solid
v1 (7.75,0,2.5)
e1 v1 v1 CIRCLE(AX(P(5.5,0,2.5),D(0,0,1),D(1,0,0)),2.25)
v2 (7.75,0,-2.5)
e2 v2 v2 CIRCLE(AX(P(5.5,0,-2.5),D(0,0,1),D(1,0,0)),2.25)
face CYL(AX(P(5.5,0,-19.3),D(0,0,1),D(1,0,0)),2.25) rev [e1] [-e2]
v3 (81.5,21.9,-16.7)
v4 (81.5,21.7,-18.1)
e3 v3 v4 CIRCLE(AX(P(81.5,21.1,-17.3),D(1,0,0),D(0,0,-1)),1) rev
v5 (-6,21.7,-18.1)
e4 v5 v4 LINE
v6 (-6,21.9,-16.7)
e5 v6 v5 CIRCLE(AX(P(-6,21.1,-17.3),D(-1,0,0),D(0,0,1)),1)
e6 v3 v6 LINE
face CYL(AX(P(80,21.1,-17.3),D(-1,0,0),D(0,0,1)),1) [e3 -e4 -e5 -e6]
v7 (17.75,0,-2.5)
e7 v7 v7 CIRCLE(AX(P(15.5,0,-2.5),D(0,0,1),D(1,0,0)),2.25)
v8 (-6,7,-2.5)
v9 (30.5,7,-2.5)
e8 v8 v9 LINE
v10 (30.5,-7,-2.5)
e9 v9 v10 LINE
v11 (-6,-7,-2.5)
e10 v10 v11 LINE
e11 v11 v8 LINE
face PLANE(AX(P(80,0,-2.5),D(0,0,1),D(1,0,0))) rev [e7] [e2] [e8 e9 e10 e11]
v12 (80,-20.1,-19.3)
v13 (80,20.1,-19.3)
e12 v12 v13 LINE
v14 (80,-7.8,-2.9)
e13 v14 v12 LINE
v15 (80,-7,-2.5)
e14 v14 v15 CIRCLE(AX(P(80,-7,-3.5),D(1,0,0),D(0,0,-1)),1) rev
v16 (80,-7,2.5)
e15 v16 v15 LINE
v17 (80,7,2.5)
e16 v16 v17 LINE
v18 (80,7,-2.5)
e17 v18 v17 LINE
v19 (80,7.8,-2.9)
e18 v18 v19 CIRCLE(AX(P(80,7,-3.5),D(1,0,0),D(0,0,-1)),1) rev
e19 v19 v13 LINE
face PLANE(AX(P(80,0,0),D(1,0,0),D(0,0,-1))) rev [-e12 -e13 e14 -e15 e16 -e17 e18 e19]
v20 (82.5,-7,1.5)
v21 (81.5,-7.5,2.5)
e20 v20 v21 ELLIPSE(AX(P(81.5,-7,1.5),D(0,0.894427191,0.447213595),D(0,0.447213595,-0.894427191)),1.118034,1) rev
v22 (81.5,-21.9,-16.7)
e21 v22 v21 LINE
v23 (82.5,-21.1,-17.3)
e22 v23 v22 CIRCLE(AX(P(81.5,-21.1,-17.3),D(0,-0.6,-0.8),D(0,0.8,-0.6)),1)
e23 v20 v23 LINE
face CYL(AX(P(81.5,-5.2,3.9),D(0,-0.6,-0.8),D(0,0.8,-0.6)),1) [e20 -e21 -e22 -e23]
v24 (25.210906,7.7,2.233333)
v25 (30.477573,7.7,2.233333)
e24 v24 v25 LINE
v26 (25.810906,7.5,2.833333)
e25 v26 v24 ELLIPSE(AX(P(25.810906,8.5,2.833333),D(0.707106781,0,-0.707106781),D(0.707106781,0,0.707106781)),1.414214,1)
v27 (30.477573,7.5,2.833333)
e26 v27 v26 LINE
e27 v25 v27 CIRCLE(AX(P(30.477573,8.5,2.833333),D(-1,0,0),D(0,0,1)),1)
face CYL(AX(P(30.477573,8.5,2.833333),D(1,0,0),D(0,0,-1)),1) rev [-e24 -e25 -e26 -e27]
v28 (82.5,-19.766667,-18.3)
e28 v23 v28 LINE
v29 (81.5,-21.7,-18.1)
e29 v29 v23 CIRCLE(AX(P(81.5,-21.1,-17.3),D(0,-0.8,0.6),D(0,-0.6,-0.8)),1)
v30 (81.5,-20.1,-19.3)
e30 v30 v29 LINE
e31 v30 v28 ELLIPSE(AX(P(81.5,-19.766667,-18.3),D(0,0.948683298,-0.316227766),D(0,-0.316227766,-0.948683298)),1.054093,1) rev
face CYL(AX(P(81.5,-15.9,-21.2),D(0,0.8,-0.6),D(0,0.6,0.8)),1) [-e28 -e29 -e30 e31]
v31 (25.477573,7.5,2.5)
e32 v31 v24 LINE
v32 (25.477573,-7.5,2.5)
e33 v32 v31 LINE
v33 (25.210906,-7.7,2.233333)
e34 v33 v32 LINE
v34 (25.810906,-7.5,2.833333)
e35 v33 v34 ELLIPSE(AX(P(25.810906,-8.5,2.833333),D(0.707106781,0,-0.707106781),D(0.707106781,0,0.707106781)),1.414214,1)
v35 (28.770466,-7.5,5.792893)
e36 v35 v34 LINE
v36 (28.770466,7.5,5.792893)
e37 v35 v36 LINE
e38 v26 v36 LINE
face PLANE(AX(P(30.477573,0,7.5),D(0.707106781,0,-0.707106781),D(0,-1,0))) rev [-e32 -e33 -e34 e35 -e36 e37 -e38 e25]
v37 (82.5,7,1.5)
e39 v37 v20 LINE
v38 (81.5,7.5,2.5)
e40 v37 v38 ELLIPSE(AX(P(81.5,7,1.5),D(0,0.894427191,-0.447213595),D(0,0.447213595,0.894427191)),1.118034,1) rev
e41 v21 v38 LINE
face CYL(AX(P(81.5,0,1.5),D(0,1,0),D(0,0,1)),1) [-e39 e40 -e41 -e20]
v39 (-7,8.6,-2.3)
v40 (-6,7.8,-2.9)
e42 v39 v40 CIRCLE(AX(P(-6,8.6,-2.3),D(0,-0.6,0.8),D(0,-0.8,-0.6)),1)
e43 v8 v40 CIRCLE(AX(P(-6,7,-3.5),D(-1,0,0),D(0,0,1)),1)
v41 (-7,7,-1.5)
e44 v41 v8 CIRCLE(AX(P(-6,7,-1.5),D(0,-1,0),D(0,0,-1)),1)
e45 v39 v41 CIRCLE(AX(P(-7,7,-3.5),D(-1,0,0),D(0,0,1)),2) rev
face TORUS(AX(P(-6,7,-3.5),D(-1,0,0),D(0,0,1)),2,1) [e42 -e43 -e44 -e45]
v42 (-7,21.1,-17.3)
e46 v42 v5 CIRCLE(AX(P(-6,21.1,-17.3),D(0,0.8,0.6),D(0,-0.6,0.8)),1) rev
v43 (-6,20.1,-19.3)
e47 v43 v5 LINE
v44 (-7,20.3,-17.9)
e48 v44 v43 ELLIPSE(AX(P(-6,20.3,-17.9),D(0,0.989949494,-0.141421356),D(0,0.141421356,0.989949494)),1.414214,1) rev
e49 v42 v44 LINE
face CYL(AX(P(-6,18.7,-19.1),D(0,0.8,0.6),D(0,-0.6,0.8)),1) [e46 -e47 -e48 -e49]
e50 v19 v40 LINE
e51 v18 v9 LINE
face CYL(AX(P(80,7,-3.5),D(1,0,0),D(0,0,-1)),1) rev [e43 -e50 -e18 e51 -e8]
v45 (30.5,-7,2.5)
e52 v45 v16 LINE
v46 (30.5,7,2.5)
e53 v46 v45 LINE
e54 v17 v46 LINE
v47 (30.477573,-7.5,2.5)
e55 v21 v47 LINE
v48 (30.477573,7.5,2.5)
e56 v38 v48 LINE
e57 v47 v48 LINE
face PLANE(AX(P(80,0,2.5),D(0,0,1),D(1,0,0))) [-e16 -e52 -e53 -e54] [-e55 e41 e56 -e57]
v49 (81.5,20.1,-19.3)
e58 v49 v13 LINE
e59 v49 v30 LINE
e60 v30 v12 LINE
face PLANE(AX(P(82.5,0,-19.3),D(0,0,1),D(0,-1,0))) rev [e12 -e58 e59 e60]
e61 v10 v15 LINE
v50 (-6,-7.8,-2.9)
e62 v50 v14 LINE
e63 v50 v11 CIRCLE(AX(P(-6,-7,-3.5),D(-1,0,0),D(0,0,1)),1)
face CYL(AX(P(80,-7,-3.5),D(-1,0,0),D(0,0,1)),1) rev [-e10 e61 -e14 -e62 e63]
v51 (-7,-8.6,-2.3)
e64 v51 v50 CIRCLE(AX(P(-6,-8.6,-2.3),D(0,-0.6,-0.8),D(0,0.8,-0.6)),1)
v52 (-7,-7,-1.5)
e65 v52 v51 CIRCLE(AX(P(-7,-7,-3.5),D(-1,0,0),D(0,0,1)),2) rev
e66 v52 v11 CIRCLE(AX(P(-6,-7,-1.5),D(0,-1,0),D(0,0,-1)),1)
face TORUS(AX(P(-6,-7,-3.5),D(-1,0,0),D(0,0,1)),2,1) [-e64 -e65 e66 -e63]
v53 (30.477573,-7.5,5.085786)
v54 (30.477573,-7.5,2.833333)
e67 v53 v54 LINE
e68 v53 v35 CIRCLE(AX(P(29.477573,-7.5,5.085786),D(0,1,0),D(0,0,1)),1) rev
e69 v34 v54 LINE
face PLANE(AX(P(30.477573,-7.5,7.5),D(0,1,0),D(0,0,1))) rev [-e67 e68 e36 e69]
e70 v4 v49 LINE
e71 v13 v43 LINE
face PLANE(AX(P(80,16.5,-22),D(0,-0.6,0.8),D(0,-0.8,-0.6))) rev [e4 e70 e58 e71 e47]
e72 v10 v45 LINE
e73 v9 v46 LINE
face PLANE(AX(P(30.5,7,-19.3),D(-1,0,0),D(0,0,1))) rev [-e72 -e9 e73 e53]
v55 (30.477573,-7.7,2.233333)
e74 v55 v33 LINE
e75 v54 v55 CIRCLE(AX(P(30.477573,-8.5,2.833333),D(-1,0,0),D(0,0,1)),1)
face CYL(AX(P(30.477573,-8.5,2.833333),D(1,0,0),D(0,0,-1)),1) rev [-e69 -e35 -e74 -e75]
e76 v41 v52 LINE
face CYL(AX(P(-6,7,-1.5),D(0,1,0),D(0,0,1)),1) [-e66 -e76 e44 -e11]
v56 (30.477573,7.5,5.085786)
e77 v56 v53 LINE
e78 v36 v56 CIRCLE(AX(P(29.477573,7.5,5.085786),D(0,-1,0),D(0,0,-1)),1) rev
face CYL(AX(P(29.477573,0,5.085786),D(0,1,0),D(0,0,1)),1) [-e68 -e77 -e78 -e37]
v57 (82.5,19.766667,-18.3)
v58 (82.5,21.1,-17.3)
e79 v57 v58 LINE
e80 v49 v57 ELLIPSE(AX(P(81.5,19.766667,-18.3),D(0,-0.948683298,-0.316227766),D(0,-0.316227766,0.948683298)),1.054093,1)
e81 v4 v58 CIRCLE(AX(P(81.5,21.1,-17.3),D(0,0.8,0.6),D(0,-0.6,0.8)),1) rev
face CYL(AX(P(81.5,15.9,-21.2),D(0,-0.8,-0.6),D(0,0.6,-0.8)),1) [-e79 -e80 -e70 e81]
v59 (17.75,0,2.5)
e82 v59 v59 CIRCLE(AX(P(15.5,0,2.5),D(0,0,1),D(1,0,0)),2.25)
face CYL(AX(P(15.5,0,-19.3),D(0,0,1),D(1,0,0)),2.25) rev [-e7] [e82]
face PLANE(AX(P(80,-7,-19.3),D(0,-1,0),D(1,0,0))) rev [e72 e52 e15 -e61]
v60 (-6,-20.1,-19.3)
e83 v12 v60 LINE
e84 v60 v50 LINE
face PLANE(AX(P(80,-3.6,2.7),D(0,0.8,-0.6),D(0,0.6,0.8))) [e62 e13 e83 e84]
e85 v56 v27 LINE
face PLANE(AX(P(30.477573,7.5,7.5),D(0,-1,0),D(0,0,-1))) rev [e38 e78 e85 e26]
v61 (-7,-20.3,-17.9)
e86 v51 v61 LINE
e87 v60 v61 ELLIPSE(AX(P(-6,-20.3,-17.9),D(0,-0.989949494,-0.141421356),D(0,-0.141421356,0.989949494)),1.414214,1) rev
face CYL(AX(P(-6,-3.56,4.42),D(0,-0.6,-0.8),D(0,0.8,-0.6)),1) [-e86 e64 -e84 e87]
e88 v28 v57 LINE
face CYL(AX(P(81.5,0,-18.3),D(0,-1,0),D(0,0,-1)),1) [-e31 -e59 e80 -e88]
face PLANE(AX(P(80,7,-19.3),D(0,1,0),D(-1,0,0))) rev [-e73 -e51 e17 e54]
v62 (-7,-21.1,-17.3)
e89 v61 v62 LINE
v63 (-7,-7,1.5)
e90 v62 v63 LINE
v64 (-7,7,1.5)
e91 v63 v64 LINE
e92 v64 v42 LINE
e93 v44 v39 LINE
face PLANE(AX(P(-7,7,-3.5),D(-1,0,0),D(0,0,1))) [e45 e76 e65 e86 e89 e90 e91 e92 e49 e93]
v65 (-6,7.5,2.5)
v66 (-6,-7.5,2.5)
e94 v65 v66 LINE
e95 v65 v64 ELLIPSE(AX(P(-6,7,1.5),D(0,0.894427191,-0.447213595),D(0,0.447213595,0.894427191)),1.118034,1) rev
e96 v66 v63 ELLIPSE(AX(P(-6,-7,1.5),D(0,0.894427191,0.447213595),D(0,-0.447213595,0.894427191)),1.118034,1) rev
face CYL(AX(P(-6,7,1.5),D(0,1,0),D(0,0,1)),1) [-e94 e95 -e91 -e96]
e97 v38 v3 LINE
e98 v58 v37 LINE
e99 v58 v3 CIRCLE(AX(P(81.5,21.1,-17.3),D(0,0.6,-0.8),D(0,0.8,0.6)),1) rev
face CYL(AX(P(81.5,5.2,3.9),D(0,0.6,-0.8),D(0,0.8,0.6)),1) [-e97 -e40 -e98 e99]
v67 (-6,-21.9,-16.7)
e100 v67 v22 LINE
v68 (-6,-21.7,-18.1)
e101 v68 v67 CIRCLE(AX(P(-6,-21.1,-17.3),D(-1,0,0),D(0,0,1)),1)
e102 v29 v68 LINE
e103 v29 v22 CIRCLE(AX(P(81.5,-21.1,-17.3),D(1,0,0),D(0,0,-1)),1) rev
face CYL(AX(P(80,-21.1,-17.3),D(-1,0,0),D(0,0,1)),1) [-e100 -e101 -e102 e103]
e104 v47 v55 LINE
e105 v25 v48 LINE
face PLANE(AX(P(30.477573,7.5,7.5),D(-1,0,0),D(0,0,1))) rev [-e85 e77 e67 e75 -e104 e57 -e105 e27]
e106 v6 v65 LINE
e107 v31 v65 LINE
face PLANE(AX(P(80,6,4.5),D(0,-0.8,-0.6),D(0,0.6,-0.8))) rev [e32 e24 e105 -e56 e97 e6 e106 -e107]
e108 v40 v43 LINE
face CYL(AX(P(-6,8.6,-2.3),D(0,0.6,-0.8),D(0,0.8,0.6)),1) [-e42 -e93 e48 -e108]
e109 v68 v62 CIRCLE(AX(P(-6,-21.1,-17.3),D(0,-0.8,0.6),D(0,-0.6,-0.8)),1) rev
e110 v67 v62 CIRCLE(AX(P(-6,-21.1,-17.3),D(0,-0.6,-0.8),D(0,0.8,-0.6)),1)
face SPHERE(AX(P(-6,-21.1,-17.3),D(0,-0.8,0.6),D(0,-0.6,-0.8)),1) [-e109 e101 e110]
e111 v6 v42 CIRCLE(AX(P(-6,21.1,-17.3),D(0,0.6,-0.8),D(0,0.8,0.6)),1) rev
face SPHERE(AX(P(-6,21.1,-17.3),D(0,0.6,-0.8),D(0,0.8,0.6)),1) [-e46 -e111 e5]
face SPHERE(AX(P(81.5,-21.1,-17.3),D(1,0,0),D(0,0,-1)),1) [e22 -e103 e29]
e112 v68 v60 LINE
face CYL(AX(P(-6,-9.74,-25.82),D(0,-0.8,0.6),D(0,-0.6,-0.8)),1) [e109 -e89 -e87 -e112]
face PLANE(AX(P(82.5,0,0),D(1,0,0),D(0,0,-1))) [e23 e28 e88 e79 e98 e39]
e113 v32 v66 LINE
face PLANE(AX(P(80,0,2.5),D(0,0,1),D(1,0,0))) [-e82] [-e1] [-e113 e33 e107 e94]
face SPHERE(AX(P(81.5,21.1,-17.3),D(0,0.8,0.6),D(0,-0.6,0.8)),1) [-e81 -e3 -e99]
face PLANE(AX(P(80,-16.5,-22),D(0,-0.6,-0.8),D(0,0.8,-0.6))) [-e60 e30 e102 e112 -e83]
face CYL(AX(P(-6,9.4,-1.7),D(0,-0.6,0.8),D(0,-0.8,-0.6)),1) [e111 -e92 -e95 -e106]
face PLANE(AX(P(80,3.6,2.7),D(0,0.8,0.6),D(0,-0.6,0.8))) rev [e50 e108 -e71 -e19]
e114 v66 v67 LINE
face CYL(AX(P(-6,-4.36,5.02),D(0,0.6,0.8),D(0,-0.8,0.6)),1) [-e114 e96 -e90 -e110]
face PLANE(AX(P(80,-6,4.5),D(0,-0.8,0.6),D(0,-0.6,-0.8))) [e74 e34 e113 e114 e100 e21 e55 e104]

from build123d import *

# Parameters (mm, degrees)
BOSS_EXTRUDE1_DEPTH = 80
SKETCH2_R           = 2.250000000000002
SKETCH2_R_2         = 2.249999999999999
CUT_EXTRUDE1_DEPTH  = 86.91559811815314
SKETCH3_W           = 8.000000000000007
SKETCH3_H           = 15.000000000000002
BOSS_EXTRUDE2_DEPTH = 5
CHAMFER1_SIZE       = 8
FILLET1_R           = 1
BOSS_EXTRUDE3_DEPTH = 7
BOSS_EXTRUDE4_START = 2.5
BOSS_EXTRUDE4_DEPTH = 2.5
FILLET3_R           = 1


with BuildPart() as part:
    # Sketch1 → Boss-Extrude1 (new body)
    with BuildSketch(Plane.YZ):
        Polygon((-22.5, -17.5), (-7.500000000000001, 2.5000000000000004), (-7.499999999999999, -2.4999999999999996), (-20.099999999999994, -19.300000000000004), align=None)
        Polygon((7.500000000000001, 2.5000000000000004), (7.500000000000001, -2.4999999999999996), (-7.499999999999999, -2.4999999999999996), (-7.500000000000001, 2.5000000000000004), align=None)
        Polygon((7.500000000000001, 2.5000000000000004), (7.500000000000001, -2.4999999999999996), (20.099999999999994, -19.300000000000004), (22.5, -17.5), align=None)
    extrude(amount=BOSS_EXTRUDE1_DEPTH)

    # Sketch2 → Cut-Extrude1 (cut, through all)
    with BuildSketch(Plane.XY.offset(2.5000000000000004)):
        with Locations((5.5, 0)):
            Circle(SKETCH2_R)
        with Locations((15.5, 0)):
            Circle(SKETCH2_R_2)
        Polygon((80, 7.0000000000000036), (30.5, 6.999999999999997), (30.5, -7.000000000000003), (80, -6.9999999999999964), align=None)
    extrude(amount=-CUT_EXTRUDE1_DEPTH, mode=Mode.SUBTRACT)

    # Sketch3 → Boss-Extrude2 (add)
    with BuildSketch(Plane.XY.offset(2.5000000000000004)):
        with Locations((26.47757310370073, 0)):
            Rectangle(SKETCH3_W, SKETCH3_H)
    extrude(amount=BOSS_EXTRUDE2_DEPTH)

    # Chamfer1
    # the kernel refuses this chamfer: 8 mm, written as the material it takes off along each edge
    with BuildSketch(Plane(origin=(22.477573103700728, 28.073463903727287, 7.5), x_dir=(-0.027495876610586494, 0, -0.9996219169112968), z_dir=(0, -1, 0))) as chamfer1_piece_1_section:
        Polygon((CHAMFER1_SIZE * 0.999621916911, CHAMFER1_SIZE * 0.0274958766106), (-CHAMFER1_SIZE * 0.0274958766106, CHAMFER1_SIZE * 0.999621916911), (0, 0), align=None)
    chamfer1_piece_1 = extrude(amount=56.146927807454574, mode=Mode.PRIVATE)
    chamfer1_piece_1 = split(chamfer1_piece_1, bisect_by=Plane(origin=(25.44368954303125, 0, 2.5000000000000004), z_dir=(0, 0, 1)), keep=Keep.TOP, mode=Mode.PRIVATE)
    add(chamfer1_piece_1, mode=Mode.SUBTRACT)

    # Fillet1
    fillet1_edges = [part.edges().sort_by_distance(p)[0] for p in [
        (40, -7.499999999999999, -2.4999999999999996),
        (40, 7.500000000000001, -2.4999999999999996),
        (27.977573103699285, 7.500000000000001, 2.5000000000000004),
        (27.977573103699285, -7.500000000000001, 2.5000000000000004),
        (30.47757310370073, 0, 7.5),
    ]]
    fillet(fillet1_edges, radius=FILLET1_R)

    # Sketch4 → Boss-Extrude3 (add)
    with BuildSketch(Plane(origin=(0, 0, 0), x_dir=(0, -1, 0), z_dir=(-1, 0, 0))):
        with BuildLine():
            Line((22.5, -17.5), (7.500000000000001, 2.5000000000000004))
            Line((7.500000000000001, 2.5000000000000004), (-7.500000000000001, 2.5000000000000004))
            Line((-7.500000000000001, 2.5000000000000004), (-22.5, -17.5))
            Line((-22.5, -17.5), (-20.099999999999994, -19.300000000000004))
            Line((-20.099999999999994, -19.300000000000004), (-7.800000000000002, -2.9000000000000004))
            ThreePointArc((-7.800000000000002, -2.9000000000000004), (-7.447213595499958, -2.6055728090000834), (-6.999999999999999, -2.4999999999999987))
            Line((-6.999999999999999, -2.4999999999999987), (6.999999999999998, -2.4999999999999996))
            ThreePointArc((6.999999999999998, -2.4999999999999996), (7.4472135954999565, -2.6055728090000834), (7.799999999999999, -2.8999999999999995))
            Line((7.799999999999999, -2.8999999999999995), (20.099999999999998, -19.300000000000008))
            Line((20.099999999999998, -19.300000000000008), (22.5, -17.5))
        make_face()
    extrude(amount=BOSS_EXTRUDE3_DEPTH)

    # Sketch6 → Boss-Extrude4 (add)
    with BuildSketch(Plane.YZ.offset(80).offset(BOSS_EXTRUDE4_START)):
        with BuildLine():
            Line((-6.9999999999999964, -2.4999999999999987), (-6.9999999999999964, 2.5000000000000004))
            Line((-6.9999999999999964, 2.5000000000000004), (7.0000000000000036, 2.5000000000000004))
            Line((7.0000000000000036, 2.5000000000000004), (7.0000000000000036, -2.4999999999999996))
            ThreePointArc((7.0000000000000036, -2.4999999999999996), (7.44721359549996, -2.605572809000085), (7.800000000000002, -2.9000000000000004))
            Line((7.800000000000002, -2.9000000000000004), (20.099999999999994, -19.300000000000004))
            Line((20.099999999999994, -19.300000000000004), (-20.099999999999998, -19.300000000000008))
            Line((-20.099999999999998, -19.300000000000008), (-7.799999999999999, -2.8999999999999995))
            ThreePointArc((-7.799999999999999, -2.8999999999999995), (-7.447213595499956, -2.6055728090000825), (-6.9999999999999964, -2.4999999999999987))
        make_face()
        with BuildLine():
            ThreePointArc((-6.9999999999999964, -2.4999999999999987), (-7.447213595499956, -2.6055728090000825), (-7.799999999999999, -2.8999999999999995))
            Line((-7.799999999999999, -2.8999999999999995), (-20.099999999999998, -19.300000000000008))
            Line((-20.099999999999998, -19.300000000000008), (-22.5, -17.5))
            Line((-22.5, -17.5), (-7.500000000000001, 2.5000000000000004))
            Line((-7.500000000000001, 2.5000000000000004), (-6.9999999999999964, 2.5000000000000004))
            Line((-6.9999999999999964, 2.5000000000000004), (-6.9999999999999964, -2.4999999999999987))
        make_face()
        with BuildLine():
            Line((7.500000000000001, 2.5000000000000004), (7.0000000000000036, 2.5000000000000004))
            Line((7.0000000000000036, 2.5000000000000004), (7.0000000000000036, -2.4999999999999996))
            ThreePointArc((7.0000000000000036, -2.4999999999999996), (7.44721359549996, -2.605572809000085), (7.800000000000002, -2.9000000000000004))
            Line((7.800000000000002, -2.9000000000000004), (20.099999999999994, -19.300000000000004))
            Line((20.099999999999994, -19.300000000000004), (22.5, -17.5))
            Line((22.5, -17.5), (7.500000000000001, 2.5000000000000004))
        make_face()
    extrude(amount=-BOSS_EXTRUDE4_DEPTH)

    # Fillet3
    fillet3_edges = [part.edges().sort_by_distance(p)[0] for p in [
        (-7, -21.299999999999997, -18.400000000000002),
        (-7, -15, -7.5),
        (-7, 0, 2.5000000000000004),
        (37.75, 22.5, -17.5),
        (-7, 15, -7.5),
        (-7, 21.299999999999997, -18.400000000000002),
        (-7, 13.949999999999998, -11.100000000000001),
        (-7, 7.447213595499958, -2.605572809000084),
        (-7, 8.9e-16, -2.499999999999999),
        (-7, -7.4472135954999565, -2.6055728090000834),
        (-7, -13.95, -11.100000000000005),
        (37.75, -22.5, -17.5),
        (82.5, 0, 2.5000000000000004),
        (82.5, -15, -7.5),
        (82.5, -21.299999999999997, -18.400000000000002),
        (82.5, 0, -19.300000000000004),
        (82.5, 21.299999999999997, -18.400000000000002),
        (82.5, 15, -7.5),
    ]]
    fillet(fillet3_edges, radius=FILLET3_R)


solid = part.part
